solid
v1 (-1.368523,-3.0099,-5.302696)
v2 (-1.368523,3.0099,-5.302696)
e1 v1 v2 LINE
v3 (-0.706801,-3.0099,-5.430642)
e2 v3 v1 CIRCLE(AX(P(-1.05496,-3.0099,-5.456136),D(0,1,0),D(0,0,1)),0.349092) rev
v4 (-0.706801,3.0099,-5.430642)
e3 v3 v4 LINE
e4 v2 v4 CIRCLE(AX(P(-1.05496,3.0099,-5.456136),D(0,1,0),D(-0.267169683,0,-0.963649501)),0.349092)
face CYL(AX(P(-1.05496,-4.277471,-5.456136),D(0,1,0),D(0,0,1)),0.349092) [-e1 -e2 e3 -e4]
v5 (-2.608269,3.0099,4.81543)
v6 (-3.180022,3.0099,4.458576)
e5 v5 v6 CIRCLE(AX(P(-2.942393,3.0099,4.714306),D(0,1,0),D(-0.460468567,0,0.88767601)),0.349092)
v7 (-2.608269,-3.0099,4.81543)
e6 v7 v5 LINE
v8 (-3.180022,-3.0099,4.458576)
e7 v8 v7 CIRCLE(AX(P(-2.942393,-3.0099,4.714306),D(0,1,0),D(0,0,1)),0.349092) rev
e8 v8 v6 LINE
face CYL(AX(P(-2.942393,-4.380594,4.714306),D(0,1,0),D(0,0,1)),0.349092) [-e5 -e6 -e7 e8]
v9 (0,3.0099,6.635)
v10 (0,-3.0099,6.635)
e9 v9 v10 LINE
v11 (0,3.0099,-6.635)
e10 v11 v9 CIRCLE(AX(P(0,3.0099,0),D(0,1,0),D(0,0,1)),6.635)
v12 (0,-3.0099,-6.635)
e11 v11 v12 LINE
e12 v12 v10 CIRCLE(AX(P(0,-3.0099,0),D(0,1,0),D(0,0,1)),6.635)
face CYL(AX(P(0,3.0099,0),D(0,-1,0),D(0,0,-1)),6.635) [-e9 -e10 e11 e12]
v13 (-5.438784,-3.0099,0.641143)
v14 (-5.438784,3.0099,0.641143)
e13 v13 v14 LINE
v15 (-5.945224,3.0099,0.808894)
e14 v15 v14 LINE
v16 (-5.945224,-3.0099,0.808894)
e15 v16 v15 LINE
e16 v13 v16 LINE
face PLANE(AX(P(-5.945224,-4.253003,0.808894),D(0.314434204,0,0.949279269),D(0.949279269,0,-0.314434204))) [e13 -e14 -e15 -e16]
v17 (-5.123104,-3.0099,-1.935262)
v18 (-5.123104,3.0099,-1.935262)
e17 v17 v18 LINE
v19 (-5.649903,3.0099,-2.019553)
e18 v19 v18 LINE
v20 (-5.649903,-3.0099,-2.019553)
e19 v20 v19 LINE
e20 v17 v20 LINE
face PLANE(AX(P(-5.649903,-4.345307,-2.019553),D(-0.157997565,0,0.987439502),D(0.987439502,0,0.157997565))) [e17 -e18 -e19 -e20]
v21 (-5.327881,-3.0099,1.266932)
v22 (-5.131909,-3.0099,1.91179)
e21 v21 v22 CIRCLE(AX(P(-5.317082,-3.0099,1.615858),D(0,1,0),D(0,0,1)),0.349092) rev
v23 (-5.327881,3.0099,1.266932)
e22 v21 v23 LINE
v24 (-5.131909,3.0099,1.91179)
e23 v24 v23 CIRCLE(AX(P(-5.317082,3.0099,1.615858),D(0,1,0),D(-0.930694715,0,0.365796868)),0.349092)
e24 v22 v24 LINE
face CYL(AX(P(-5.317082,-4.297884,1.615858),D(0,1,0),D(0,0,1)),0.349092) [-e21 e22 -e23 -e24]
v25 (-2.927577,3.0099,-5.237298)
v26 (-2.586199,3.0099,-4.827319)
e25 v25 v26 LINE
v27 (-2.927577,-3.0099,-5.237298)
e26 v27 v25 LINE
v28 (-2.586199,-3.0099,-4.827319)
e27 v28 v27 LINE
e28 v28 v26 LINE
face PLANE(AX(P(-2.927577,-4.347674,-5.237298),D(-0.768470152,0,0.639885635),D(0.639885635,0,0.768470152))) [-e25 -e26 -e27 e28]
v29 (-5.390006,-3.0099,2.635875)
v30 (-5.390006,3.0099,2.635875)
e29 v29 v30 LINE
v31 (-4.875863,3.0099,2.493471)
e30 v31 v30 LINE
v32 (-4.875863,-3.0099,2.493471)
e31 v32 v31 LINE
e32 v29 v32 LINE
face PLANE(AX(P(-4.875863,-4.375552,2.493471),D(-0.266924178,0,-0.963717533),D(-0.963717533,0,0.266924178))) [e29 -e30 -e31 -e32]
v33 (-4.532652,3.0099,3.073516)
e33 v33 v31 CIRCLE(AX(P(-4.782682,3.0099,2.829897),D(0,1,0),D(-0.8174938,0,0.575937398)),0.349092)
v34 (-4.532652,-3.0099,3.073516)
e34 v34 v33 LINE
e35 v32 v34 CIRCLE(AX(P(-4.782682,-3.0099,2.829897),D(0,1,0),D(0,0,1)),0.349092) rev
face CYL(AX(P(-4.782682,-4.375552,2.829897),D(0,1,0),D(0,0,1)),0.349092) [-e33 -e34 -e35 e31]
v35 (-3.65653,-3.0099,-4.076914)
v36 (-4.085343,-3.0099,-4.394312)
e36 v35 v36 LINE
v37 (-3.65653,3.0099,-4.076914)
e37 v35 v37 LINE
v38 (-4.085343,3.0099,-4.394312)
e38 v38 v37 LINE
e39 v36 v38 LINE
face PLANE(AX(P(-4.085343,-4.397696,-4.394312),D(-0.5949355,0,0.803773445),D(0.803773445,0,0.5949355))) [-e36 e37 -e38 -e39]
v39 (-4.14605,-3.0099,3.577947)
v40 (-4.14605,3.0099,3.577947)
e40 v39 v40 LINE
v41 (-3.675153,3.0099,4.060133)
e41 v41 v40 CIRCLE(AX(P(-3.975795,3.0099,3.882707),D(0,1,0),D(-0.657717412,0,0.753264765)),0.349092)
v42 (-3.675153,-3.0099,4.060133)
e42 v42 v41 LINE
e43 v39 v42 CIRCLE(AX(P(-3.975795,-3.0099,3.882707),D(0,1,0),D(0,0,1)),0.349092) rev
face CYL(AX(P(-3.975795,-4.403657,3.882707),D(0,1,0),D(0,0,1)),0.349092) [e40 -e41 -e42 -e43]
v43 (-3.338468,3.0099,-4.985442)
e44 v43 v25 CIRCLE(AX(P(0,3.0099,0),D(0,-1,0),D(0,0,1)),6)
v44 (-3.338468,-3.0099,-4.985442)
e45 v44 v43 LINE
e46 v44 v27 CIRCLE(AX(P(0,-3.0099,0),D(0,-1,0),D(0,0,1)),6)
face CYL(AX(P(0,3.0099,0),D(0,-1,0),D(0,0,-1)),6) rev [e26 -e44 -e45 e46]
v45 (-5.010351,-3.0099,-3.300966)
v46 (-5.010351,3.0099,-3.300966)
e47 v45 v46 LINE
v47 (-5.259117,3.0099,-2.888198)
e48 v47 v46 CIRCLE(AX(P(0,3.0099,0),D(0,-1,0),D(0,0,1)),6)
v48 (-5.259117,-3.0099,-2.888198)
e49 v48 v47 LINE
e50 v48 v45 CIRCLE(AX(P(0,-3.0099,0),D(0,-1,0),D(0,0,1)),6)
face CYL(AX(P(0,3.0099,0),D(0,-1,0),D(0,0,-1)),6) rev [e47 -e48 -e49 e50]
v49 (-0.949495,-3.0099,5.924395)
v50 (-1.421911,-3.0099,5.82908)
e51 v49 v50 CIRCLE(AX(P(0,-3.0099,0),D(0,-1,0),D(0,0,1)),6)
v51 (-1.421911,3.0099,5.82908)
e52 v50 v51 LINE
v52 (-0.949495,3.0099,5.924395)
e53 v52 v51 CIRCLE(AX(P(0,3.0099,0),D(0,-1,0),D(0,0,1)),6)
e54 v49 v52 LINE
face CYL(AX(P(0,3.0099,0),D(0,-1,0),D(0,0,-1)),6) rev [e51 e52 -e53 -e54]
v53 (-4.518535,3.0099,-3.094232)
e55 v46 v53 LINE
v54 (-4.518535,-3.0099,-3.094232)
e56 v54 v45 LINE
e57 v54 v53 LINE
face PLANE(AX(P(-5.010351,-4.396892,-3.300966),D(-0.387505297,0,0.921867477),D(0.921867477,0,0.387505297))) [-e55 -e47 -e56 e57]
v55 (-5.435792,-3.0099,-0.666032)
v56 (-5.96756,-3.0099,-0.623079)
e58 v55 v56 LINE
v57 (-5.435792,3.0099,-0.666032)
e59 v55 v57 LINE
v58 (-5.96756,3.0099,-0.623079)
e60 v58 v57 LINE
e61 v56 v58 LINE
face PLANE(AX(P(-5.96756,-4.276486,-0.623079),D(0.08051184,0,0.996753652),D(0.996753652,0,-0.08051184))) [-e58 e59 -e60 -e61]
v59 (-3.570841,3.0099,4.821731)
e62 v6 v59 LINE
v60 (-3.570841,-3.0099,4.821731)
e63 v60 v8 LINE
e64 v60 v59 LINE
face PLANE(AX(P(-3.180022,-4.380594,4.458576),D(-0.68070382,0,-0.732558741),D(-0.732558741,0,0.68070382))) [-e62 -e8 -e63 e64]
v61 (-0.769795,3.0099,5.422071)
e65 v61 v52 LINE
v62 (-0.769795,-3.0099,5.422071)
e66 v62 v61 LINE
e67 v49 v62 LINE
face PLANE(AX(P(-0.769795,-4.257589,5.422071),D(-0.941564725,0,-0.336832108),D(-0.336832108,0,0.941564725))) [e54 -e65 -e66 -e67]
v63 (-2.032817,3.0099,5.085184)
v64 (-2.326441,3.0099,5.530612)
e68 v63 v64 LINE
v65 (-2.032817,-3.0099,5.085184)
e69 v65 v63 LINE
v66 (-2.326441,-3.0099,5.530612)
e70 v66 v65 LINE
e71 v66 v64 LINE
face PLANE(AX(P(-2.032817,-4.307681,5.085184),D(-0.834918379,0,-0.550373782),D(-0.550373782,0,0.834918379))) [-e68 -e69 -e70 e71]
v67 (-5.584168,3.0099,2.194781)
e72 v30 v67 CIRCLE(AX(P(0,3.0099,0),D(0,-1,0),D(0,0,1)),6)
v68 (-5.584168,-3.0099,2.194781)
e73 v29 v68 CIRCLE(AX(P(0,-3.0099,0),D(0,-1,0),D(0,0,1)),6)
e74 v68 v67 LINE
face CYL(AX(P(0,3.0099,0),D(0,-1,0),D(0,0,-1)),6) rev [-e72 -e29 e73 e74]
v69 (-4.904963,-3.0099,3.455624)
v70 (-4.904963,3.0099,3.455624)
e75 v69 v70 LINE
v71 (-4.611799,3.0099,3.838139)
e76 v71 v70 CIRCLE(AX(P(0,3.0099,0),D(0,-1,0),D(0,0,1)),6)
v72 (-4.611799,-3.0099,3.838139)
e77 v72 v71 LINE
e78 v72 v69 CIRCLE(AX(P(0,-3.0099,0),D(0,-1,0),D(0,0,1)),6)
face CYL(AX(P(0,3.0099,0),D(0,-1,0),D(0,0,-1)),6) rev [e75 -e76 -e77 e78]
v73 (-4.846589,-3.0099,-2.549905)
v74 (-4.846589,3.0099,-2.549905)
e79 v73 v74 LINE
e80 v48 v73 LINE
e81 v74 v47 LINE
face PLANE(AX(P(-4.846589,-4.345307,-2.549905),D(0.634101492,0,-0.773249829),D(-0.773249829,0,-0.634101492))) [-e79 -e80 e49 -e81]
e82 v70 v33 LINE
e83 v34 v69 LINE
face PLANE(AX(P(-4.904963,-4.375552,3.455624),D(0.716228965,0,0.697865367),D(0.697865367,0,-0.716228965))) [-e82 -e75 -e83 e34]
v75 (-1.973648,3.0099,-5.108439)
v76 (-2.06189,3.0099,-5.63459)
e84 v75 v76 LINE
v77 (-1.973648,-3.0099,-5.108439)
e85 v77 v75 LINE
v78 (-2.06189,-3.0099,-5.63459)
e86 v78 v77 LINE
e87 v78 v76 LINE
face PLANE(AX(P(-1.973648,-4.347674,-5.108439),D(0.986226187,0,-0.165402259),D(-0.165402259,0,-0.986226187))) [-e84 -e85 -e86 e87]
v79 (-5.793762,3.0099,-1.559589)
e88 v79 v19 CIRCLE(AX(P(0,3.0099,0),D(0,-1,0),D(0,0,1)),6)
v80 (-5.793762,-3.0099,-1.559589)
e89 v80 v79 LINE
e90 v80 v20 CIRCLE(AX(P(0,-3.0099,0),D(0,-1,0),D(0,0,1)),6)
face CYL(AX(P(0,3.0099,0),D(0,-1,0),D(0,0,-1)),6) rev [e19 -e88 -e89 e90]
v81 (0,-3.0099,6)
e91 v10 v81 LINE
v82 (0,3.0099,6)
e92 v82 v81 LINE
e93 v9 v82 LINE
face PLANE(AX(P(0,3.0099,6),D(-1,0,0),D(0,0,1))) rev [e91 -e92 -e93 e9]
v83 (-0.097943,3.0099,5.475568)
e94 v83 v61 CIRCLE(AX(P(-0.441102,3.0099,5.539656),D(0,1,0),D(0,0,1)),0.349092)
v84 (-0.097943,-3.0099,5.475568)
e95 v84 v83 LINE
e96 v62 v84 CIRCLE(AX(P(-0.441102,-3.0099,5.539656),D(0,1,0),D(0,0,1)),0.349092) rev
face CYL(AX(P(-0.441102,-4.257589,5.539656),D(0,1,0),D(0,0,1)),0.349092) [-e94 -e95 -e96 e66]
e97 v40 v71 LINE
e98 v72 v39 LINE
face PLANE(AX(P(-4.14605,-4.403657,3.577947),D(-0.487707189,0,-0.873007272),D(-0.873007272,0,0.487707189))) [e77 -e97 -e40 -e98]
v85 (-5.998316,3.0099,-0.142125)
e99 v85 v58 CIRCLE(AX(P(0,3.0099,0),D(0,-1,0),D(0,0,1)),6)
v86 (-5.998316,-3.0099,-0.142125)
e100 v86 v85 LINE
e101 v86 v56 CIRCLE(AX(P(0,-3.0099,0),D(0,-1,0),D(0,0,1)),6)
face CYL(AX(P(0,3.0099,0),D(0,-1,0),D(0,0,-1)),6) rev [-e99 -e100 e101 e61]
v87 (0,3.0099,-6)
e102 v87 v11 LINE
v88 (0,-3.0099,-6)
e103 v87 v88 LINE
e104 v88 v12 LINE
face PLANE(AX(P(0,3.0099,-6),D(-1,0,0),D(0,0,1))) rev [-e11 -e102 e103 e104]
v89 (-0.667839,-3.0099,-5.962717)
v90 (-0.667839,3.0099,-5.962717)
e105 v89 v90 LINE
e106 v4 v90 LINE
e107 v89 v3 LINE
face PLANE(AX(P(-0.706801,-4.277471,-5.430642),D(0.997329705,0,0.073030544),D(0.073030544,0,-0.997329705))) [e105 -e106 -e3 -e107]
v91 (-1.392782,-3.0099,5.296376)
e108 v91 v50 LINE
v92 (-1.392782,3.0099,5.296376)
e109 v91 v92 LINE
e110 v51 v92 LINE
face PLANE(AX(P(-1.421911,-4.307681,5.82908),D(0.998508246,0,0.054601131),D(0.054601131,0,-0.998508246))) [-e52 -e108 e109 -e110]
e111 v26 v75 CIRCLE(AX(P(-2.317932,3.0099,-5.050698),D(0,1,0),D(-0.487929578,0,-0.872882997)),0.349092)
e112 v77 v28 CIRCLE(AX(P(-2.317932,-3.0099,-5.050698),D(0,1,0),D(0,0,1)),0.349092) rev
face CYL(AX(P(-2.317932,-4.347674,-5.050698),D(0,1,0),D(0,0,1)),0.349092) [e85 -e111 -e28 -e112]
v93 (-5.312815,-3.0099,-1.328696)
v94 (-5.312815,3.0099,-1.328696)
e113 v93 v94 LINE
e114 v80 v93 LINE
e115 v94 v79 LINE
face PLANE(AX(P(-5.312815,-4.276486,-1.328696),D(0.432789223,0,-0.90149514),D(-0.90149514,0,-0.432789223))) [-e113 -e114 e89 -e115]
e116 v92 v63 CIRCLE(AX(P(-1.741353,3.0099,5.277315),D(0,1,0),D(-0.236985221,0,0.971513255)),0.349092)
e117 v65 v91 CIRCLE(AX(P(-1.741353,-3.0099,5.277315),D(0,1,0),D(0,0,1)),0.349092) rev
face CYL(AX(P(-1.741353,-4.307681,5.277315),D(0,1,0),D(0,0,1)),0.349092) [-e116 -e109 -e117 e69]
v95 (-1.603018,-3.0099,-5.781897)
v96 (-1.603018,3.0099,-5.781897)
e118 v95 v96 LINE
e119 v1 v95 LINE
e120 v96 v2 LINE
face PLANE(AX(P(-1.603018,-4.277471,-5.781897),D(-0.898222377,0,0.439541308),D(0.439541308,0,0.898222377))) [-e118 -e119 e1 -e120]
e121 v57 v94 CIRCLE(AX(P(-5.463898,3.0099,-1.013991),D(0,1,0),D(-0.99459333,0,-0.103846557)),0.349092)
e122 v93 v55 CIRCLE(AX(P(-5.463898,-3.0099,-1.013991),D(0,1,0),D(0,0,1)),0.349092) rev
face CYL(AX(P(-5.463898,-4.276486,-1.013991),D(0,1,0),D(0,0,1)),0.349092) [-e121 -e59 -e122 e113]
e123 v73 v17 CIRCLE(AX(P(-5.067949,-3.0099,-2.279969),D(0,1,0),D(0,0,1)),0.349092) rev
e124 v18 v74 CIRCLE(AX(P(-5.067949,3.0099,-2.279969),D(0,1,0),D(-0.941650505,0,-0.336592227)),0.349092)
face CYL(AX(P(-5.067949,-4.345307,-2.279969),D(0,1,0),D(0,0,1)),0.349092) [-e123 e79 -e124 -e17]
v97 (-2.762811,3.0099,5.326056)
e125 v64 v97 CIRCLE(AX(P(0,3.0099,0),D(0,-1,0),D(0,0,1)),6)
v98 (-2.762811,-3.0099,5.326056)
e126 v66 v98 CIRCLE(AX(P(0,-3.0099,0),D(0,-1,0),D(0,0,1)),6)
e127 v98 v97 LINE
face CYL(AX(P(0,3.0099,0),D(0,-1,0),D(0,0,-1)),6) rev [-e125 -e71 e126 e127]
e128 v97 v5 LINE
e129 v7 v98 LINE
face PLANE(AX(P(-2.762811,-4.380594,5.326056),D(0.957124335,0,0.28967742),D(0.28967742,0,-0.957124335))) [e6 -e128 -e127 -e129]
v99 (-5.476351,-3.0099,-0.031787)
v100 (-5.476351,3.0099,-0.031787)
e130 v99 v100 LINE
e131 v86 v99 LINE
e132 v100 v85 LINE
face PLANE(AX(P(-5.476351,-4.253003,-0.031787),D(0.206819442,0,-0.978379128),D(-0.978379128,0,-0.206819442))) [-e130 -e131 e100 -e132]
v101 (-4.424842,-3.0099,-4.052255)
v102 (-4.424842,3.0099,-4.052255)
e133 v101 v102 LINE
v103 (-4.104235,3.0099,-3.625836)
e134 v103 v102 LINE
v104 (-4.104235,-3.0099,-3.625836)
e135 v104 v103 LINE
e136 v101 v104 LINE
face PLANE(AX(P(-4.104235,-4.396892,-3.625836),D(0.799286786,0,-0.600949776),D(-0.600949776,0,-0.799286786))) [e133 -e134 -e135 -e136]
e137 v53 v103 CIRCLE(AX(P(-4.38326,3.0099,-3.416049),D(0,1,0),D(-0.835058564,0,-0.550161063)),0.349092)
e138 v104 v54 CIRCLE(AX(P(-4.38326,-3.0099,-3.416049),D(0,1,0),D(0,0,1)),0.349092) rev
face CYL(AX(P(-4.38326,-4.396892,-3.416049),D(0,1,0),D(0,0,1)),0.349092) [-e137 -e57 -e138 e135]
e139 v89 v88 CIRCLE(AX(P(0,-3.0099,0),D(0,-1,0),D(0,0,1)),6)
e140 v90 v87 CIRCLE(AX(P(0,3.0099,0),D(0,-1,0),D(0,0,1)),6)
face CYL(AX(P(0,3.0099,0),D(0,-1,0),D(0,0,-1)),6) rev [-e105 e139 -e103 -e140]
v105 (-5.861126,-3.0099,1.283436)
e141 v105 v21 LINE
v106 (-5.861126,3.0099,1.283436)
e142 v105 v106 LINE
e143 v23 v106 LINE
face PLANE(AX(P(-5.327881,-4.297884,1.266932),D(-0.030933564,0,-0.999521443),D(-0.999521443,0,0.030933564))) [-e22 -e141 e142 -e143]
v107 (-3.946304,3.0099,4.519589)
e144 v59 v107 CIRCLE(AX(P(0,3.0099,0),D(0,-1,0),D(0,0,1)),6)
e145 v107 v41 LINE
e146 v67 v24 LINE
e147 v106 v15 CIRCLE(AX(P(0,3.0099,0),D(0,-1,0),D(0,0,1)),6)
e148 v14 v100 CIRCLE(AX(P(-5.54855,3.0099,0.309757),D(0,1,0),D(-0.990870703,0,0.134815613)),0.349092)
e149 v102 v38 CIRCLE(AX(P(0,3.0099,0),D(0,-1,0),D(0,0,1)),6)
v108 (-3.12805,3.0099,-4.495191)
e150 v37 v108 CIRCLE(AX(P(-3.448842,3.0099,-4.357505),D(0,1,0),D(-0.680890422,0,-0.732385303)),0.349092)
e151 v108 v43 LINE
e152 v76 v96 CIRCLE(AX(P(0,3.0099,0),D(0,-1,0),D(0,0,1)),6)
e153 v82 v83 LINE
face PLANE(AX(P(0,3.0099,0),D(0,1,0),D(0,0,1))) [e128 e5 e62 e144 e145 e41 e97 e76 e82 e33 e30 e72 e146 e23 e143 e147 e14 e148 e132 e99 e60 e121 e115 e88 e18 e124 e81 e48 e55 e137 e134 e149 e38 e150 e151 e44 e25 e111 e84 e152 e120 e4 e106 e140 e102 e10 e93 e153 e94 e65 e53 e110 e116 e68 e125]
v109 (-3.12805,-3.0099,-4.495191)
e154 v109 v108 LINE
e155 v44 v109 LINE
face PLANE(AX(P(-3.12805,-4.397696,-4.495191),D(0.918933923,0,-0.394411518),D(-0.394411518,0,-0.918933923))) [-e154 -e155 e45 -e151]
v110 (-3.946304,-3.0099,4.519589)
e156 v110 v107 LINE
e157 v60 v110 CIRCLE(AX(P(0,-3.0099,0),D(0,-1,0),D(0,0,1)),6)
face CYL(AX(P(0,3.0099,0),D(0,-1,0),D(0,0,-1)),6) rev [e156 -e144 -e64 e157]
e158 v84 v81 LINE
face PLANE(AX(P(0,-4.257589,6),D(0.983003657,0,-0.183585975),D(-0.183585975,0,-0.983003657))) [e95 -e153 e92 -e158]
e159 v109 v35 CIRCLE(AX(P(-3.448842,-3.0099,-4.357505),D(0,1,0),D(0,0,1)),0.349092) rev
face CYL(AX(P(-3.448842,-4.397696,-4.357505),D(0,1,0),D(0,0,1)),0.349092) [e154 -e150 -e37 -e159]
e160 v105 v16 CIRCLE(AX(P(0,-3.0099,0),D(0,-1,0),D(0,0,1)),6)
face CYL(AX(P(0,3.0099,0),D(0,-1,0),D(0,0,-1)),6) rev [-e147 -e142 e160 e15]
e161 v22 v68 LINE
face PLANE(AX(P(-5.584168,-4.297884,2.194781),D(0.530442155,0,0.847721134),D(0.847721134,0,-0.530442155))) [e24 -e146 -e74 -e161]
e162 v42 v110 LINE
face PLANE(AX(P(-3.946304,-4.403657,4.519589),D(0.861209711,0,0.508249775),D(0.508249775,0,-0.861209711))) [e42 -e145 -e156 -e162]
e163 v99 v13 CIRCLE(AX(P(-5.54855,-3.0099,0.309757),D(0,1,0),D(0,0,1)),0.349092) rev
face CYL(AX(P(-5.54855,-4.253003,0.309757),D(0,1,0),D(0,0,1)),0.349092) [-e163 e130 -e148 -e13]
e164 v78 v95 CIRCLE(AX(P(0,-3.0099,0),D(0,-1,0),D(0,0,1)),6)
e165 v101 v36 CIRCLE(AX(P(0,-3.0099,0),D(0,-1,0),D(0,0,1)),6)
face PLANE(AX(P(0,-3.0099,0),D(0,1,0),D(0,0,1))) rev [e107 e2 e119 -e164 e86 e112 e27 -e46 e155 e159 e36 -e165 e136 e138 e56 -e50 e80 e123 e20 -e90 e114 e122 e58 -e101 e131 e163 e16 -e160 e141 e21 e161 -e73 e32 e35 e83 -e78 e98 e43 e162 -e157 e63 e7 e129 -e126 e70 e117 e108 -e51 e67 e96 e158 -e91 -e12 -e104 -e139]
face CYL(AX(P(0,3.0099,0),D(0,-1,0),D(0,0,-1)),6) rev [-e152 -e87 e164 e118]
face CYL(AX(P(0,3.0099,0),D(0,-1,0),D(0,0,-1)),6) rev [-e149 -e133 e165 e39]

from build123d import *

# Parameters (mm, degrees)
BOSS_EXTRUDE1_DEPTH = 3.0099
BOSS_EXTRUDE2_DEPTH = 6.0198
CRVPATTERN1_START   = -3.0099
CRVPATTERN1_DEPTH   = 6.0198


# Read off the part's stored shape, not the designer's step: CrvPattern1
with BuildPart() as part:
    # Sketch1 → Boss-Extrude1 (new, symmetric)
    with BuildSketch(Plane(origin=(0, 0, 0), x_dir=(1, 0, 0), z_dir=(0, 1, 0))):
        with BuildLine():
            Line((0, -6), (0, -6.635))
            ThreePointArc((0, -6.635), (-6.635, 0), (0, 6.635))
            Line((0, 6.635), (0, 6))
            ThreePointArc((0, 6), (-6, 0), (0, -6))
        make_face()
    extrude(amount=BOSS_EXTRUDE1_DEPTH, both=True)

    # Sketch2 → Boss-Extrude2 (add)
    with BuildSketch(Plane(origin=(0, 3.0099, 0), x_dir=(1, 0, 0), z_dir=(0, 1, 0))):
        with BuildLine():
            Line((0, -6), (-0.097943085, -5.475567721))
            ThreePointArc((-0.097943085, -5.475567721), (-0.413392769, -5.191665428), (-0.769794827, -5.422070697))
            Line((-0.769794827, -5.422070697), (-0.949494698, -5.924395312))
            ThreePointArc((-0.949494698, -5.924395312), (-0.47625, -5.981068963), (0, -6))
        make_face()
    extrude(amount=-BOSS_EXTRUDE2_DEPTH)

    # CrvPattern1 outline → CrvPattern1 (add)
    with BuildSketch(Plane(origin=(0, 0, 0), x_dir=(1, 0, 0), z_dir=(0, 1, 0)).offset(CRVPATTERN1_START)):
        with BuildLine():
            ThreePointArc((-1.392781631, -5.296375557), (-1.631964533, -4.945803803), (-2.0328165, -5.085183555))
            Line((-2.0328165, -5.085183555), (-2.326440816, -5.530612365))
            ThreePointArc((-2.326440816, -5.530612365), (-1.880108137, -5.697823566), (-1.421911325, -5.829079531))
            Line((-1.421911325, -5.829079531), (-1.392781631, -5.296375557))
        make_face()
        with BuildLine():
            ThreePointArc((-0.667838723, 5.962716784), (-1.139022221, 5.890893683), (-1.603018095, 5.781897006))
            Line((-1.603018095, 5.781897006), (-1.368522884, 5.302695525))
            ThreePointArc((-1.368522884, 5.302695525), (-0.988689868, 5.113391814), (-0.706800505, 5.430641561))
            Line((-0.706800505, 5.430641561), (-0.667838723, 5.962716784))
        make_face()
        with BuildLine():
            ThreePointArc((-2.061889926, 5.634590485), (-2.502629927, 5.453149865), (-2.927577467, 5.237297984))
            Line((-2.927577467, 5.237297984), (-2.586198593, 4.827319293))
            ThreePointArc((-2.586198593, 4.827319293), (-2.172323601, 4.733423039), (-1.97364785, 5.108438987))
            Line((-1.97364785, 5.108438987), (-2.061889926, 5.634590485))
        make_face()
        with BuildLine():
            ThreePointArc((-3.338468064, 4.985441905), (-3.723654071, 4.704721071), (-4.085342534, 4.394311821))
            Line((-4.085342534, 4.394311821), (-3.656529542, 4.076913836))
            ThreePointArc((-3.656529542, 4.076913836), (-3.232192478, 4.083774637), (-3.128049589, 4.495190818))
            Line((-3.128049589, 4.495190818), (-3.338468064, 4.985441905))
        make_face()
        with BuildLine():
            ThreePointArc((-4.424842028, 4.052255302), (-4.732528651, 3.6882479), (-5.010351382, 3.300966378))
            Line((-5.010351382, 3.300966378), (-4.518535244, 3.09423237))
            ThreePointArc((-4.518535244, 3.09423237), (-4.10791207, 3.201459343), (-4.104235427, 3.625835941))
            Line((-4.104235427, 3.625835941), (-4.424842028, 4.052255302))
        make_face()
        with BuildLine():
            ThreePointArc((-5.2591173, 2.888197574), (-5.471774558, 2.461642376), (-5.649903027, 2.019553363))
            Line((-5.649903027, 2.019553363), (-5.123104226, 1.93526169))
            ThreePointArc((-5.123104226, 1.93526169), (-4.749589577, 2.136745739), (-4.846588652, 2.549904539))
            Line((-4.846588652, 2.549904539), (-5.2591173, 2.888197574))
        make_face()
        with BuildLine():
            ThreePointArc((-5.793762308, 1.559589152), (-5.899274375, 1.094788495), (-5.967559981, 0.623079345))
            Line((-5.967559981, 0.623079345), (-5.435792082, 0.666032397))
            ThreePointArc((-5.435792082, 0.666032397), (-5.120666391, 0.950294273), (-5.312814808, 1.328696177))
            Line((-5.312814808, 1.328696177), (-5.793762308, 1.559589152))
        make_face()
        with BuildLine():
            ThreePointArc((-5.998316459, 0.142125493), (-5.990671945, -0.334439306), (-5.945224219, -0.808893678))
            Line((-5.945224219, -0.808893678), (-5.438783895, -0.641143085))
            ThreePointArc((-5.438783895, -0.641143085), (-5.200000973, -0.290298773), (-5.476351366, 0.031787357))
            Line((-5.476351366, 0.031787357), (-5.998316459, 0.142125493))
        make_face()
        with BuildLine():
            ThreePointArc((-5.861125591, -1.28343555), (-5.740760029, -1.744612933), (-5.584168287, -2.194781205))
            Line((-5.584168287, -2.194781205), (-5.131909211, -1.911790408))
            ThreePointArc((-5.131909211, -1.911790408), (-4.983073354, -1.514352485), (-5.327881076, -1.266932499))
            Line((-5.327881076, -1.266932499), (-5.861125591, -1.28343555))
        make_face()
        with BuildLine():
            ThreePointArc((-5.390005944, -2.635874792), (-5.163776982, -3.055389873), (-4.904962802, -3.455624388))
            Line((-4.904962802, -3.455624388), (-4.532651751, -3.073516361))
            ThreePointArc((-4.532651751, -3.073516361), (-4.482242656, -2.652128252), (-4.875862809, -2.49347079))
            Line((-4.875862809, -2.49347079), (-5.390005944, -2.635874792))
        make_face()
        with BuildLine():
            ThreePointArc((-4.611798851, -3.838139049), (-4.292595541, -4.19209059), (-3.94630447, -4.519588591))
            Line((-3.94630447, -4.519588591), (-3.675153304, -4.060133361))
            ThreePointArc((-3.675153304, -4.060133361), (-3.726042954, -3.638803018), (-4.146049624, -3.577947349))
            Line((-4.146049624, -3.577947349), (-4.611798851, -3.838139049))
        make_face()
        with BuildLine():
            ThreePointArc((-3.570841484, -4.821731131), (-3.176849953, -5.089953278), (-2.762811401, -5.326056061))
            Line((-2.762811401, -5.326056061), (-2.608268548, -4.815430396))
            ThreePointArc((-2.608268548, -4.815430396), (-2.757557583, -4.418162477), (-3.180021524, -4.458575762))
            Line((-3.180021524, -4.458575762), (-3.570841484, -4.821731131))
        make_face()
    extrude(amount=CRVPATTERN1_DEPTH)


solid = part.part
